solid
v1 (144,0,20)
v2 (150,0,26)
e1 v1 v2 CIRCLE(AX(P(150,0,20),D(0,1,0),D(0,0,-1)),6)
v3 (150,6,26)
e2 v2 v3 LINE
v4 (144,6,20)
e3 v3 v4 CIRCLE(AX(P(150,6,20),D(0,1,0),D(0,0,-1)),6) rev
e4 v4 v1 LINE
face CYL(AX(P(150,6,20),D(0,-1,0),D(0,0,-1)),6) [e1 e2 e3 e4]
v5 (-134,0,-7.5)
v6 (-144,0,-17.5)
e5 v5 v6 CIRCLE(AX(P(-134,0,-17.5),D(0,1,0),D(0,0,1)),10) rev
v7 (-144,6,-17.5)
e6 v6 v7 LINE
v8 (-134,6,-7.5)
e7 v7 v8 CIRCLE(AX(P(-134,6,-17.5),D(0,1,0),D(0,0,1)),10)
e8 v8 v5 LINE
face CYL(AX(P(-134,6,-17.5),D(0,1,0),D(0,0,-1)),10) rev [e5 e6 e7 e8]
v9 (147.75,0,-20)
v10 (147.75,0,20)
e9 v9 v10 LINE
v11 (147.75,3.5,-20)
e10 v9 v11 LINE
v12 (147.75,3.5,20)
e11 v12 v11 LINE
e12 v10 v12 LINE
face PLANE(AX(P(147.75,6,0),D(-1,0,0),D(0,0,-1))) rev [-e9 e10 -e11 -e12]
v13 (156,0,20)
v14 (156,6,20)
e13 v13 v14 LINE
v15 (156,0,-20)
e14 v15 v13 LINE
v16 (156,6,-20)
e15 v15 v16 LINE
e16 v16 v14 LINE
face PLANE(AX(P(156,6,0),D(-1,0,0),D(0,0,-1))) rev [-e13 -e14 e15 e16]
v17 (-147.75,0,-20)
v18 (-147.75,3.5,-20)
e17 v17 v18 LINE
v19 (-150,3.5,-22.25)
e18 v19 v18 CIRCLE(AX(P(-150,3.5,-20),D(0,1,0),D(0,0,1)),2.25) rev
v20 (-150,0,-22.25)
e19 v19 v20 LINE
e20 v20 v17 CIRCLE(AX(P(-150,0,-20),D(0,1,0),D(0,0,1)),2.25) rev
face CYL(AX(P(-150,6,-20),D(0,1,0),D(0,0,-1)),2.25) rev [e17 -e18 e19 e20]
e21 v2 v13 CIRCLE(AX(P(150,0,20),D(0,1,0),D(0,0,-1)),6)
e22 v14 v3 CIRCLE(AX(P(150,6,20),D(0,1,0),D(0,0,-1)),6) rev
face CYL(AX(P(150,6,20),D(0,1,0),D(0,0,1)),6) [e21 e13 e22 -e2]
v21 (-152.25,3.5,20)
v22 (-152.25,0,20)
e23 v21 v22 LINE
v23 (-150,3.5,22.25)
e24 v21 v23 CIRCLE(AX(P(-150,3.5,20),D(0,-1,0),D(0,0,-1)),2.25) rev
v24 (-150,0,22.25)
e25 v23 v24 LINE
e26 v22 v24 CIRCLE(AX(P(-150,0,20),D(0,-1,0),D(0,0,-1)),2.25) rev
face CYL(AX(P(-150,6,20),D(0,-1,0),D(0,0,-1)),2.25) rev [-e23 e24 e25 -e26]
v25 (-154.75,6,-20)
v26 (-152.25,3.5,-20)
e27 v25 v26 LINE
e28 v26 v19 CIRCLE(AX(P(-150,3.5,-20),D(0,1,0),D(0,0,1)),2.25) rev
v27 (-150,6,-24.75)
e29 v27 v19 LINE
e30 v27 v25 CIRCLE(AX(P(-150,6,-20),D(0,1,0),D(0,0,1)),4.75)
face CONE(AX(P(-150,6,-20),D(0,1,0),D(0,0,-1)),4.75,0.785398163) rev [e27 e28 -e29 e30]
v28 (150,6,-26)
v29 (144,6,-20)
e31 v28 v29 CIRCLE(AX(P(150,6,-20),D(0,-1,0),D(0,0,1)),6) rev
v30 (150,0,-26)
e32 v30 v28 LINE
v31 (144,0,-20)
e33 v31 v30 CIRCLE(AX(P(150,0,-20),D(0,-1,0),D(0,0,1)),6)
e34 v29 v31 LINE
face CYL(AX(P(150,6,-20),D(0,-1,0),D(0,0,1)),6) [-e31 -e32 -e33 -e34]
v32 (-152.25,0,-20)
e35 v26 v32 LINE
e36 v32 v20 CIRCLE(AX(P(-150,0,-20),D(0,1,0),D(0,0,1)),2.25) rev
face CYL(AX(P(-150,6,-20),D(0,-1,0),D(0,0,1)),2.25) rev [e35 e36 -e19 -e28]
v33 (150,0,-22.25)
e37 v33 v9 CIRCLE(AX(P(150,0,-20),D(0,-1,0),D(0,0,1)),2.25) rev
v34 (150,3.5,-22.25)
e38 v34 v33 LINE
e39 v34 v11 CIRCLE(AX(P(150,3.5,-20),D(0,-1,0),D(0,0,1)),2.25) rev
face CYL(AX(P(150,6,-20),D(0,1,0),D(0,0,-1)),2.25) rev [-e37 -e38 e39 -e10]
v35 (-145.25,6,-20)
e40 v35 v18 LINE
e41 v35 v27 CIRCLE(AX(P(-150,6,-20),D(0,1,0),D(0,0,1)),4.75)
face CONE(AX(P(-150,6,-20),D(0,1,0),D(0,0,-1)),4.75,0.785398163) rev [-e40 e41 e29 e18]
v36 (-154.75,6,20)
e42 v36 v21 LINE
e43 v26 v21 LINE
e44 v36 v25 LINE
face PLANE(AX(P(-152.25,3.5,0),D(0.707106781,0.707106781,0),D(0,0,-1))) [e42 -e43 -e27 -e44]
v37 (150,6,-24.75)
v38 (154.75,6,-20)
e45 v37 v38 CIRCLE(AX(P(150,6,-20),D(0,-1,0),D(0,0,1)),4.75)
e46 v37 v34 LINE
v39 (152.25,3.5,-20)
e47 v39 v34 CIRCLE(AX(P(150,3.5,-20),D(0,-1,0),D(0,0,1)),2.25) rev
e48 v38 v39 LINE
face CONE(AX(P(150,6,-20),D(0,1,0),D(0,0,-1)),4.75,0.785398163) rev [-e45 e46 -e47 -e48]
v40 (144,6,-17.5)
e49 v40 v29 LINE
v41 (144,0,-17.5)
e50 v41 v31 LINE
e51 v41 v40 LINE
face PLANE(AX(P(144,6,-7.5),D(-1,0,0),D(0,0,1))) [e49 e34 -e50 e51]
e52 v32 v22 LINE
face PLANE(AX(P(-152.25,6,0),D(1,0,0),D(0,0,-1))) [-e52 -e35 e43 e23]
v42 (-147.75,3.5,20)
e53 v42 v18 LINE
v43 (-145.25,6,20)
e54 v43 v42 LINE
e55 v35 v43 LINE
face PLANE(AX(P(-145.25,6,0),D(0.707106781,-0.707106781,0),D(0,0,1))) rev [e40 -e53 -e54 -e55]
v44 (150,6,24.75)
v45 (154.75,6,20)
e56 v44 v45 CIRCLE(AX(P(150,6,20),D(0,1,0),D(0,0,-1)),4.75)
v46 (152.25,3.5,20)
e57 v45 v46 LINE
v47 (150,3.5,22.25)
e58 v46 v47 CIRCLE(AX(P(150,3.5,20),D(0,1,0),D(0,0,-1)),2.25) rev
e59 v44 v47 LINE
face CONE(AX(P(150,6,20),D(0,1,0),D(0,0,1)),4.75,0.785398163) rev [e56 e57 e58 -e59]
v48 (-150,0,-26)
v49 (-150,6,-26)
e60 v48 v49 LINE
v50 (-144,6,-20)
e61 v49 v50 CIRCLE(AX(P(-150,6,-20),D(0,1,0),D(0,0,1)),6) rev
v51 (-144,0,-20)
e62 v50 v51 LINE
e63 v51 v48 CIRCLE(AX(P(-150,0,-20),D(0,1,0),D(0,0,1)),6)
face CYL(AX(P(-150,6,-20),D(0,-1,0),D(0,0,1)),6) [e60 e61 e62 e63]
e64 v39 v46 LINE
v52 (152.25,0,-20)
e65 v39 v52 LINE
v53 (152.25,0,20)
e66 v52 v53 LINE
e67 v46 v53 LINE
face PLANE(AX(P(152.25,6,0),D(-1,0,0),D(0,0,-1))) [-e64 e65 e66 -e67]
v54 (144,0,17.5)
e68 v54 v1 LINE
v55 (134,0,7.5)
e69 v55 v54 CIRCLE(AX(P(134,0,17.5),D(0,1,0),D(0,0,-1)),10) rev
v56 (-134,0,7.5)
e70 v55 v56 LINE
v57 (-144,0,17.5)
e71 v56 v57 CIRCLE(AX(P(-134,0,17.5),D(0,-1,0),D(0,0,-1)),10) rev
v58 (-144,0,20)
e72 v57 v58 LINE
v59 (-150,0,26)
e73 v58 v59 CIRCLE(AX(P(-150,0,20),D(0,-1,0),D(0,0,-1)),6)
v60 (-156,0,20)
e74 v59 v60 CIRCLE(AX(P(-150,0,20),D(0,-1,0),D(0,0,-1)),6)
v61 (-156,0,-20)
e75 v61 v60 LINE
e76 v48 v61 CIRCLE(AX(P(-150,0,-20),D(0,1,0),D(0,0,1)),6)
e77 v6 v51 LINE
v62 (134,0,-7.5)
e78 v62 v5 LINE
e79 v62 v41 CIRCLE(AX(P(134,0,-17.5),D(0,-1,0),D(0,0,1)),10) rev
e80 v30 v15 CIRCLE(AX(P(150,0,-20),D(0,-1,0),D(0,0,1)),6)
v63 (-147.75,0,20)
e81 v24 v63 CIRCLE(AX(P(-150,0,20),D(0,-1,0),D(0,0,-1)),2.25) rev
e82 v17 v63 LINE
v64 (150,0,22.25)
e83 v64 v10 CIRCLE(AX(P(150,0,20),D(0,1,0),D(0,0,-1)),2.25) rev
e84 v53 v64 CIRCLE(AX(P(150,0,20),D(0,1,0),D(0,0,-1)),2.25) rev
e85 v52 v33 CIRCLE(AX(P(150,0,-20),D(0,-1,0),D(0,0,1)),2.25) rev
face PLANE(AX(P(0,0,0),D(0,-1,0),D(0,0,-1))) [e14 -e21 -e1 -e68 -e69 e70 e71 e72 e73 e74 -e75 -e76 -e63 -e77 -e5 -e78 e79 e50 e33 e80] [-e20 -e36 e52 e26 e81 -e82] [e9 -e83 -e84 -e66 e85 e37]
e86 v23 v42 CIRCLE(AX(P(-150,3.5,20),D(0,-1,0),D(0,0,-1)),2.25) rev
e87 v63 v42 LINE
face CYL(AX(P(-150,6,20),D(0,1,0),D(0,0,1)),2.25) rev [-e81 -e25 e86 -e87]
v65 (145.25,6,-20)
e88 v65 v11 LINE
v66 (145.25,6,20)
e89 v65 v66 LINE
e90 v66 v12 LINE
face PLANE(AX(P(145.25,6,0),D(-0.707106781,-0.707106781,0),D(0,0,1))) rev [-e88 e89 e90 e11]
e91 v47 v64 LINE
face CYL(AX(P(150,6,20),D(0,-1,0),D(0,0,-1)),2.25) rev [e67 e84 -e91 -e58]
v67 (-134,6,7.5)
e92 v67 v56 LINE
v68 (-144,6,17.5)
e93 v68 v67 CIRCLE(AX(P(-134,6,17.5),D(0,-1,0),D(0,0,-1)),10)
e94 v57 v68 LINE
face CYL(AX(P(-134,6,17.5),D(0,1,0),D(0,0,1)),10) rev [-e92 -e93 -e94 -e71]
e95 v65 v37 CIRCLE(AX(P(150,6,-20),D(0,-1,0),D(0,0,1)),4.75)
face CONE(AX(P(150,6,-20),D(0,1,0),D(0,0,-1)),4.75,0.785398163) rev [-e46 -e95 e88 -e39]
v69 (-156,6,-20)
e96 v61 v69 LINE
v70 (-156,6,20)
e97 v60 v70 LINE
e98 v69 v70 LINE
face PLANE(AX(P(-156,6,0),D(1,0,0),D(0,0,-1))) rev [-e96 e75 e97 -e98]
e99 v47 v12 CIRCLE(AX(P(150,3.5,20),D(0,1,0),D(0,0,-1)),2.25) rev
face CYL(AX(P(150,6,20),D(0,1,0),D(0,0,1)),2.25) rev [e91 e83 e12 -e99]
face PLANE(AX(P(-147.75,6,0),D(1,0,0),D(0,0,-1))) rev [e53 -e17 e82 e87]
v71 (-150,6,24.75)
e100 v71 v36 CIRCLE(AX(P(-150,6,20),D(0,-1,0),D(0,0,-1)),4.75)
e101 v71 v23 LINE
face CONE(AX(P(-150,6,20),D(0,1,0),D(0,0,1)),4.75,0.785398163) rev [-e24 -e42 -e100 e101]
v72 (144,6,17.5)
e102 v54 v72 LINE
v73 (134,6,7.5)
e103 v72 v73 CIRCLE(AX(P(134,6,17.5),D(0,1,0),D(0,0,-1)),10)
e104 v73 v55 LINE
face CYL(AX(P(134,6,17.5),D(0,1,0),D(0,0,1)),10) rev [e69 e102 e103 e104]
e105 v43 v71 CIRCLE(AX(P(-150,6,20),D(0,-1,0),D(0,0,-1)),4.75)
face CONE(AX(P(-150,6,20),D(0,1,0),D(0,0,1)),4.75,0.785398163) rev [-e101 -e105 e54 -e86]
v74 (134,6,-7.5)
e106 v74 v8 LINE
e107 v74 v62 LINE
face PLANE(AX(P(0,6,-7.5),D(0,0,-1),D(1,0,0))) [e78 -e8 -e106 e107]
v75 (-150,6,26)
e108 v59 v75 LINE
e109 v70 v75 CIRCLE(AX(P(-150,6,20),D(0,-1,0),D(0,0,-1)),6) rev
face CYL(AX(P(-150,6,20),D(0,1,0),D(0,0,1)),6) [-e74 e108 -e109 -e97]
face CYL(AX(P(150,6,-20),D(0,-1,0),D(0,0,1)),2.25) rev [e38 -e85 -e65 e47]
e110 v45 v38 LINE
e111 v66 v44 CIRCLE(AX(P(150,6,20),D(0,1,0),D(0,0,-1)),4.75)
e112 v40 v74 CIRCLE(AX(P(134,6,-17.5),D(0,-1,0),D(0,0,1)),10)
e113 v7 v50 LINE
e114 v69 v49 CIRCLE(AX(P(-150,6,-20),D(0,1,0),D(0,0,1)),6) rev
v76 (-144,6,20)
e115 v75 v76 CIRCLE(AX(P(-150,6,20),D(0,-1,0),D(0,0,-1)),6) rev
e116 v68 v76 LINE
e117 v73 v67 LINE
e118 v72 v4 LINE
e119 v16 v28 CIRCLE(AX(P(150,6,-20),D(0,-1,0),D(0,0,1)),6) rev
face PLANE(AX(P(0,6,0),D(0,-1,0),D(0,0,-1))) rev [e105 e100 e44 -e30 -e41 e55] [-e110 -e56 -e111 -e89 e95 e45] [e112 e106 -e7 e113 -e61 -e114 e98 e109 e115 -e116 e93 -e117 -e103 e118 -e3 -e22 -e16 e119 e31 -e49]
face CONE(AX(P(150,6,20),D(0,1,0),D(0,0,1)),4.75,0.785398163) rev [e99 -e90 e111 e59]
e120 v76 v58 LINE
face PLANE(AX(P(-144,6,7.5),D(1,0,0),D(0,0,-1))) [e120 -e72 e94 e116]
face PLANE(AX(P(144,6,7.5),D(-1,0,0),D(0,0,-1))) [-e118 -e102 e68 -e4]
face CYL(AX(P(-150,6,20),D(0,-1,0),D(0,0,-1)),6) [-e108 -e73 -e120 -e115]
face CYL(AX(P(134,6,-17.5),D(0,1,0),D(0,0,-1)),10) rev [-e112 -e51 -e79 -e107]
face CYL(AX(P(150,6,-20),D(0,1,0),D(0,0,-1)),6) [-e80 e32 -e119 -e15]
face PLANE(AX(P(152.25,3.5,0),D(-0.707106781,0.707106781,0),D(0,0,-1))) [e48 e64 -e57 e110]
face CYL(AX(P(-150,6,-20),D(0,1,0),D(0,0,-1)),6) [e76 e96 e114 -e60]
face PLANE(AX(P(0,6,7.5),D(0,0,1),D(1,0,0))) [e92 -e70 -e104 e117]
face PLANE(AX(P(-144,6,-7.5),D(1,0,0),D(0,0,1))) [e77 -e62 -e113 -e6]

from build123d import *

# Parameters (mm, degrees)
BOSS_EXTRUDE1_DEPTH = 6
FILLET1_R           = 10
FILLET2_R           = 2.25
FILLET3_R           = 6
CHAMFER1_SIZE       = 2.5


with BuildPart() as part:
    # Sketch1 → Boss-Extrude1 (new body)
    with BuildSketch(Plane(origin=(0, 0, 0), x_dir=(1, 0, 0), z_dir=(0, 1, 0))):
        Polygon((-152.25, 0), (-156, 0), (-156, -26), (-144, -26), (-144, -7.5), (0, -7.5), (0, 0), (-85.684931507, 0), (-147.75, 0), (-147.75, -22.25), (-152.25, -22.25), align=None)
    extrude(amount=BOSS_EXTRUDE1_DEPTH)

    # Fillet1
    fillet1_edges = [part.edges().sort_by_distance(p)[0] for p in [
        (-144, 3, 7.5),
    ]]
    fillet(fillet1_edges, radius=FILLET1_R)

    # Fillet2
    fillet2_edges = [part.edges().sort_by_distance(p)[0] for p in [
        (-152.25, 3, 22.25),
        (-147.75, 3, 22.25),
    ]]
    fillet(fillet2_edges, radius=FILLET2_R - 0.0001)  # a hair under: the kernel refuses the full size

    # Fillet3
    fillet3_edges = [part.edges().sort_by_distance(p)[0] for p in [
        (-156, 3, 26),
        (-144, 3, 26),
    ]]
    fillet(fillet3_edges, radius=FILLET3_R - 0.0001)  # a hair under: the kernel refuses the full size

    # Chamfer1
    chamfer1_edges = [part.edges().sort_by_distance(p)[0] for p in [
        (-152.25, 6, 10.00005),
        (-147.75, 6, 10.00005),
        (-151.591019547, 6, 21.591019547),
        (-148.408980453, 6, 21.591019547),
    ]]
    chamfer(chamfer1_edges, length=CHAMFER1_SIZE)

    # Mirror1: part across plane


with BuildPart() as part_1:
    add(part.part)
    add(part.part.mirror(Plane(origin=(0, 6, 0), x_dir=(1, 0, 0), z_dir=(0, 0, 1))))

    # Mirror2: part across plane


with BuildPart() as part_2:
    add(part_1.part)
    add(part_1.part.mirror(Plane(origin=(0, 6, 0), x_dir=(0, 0, 1), z_dir=(1, 0, 0))))


solid = part_2.part
